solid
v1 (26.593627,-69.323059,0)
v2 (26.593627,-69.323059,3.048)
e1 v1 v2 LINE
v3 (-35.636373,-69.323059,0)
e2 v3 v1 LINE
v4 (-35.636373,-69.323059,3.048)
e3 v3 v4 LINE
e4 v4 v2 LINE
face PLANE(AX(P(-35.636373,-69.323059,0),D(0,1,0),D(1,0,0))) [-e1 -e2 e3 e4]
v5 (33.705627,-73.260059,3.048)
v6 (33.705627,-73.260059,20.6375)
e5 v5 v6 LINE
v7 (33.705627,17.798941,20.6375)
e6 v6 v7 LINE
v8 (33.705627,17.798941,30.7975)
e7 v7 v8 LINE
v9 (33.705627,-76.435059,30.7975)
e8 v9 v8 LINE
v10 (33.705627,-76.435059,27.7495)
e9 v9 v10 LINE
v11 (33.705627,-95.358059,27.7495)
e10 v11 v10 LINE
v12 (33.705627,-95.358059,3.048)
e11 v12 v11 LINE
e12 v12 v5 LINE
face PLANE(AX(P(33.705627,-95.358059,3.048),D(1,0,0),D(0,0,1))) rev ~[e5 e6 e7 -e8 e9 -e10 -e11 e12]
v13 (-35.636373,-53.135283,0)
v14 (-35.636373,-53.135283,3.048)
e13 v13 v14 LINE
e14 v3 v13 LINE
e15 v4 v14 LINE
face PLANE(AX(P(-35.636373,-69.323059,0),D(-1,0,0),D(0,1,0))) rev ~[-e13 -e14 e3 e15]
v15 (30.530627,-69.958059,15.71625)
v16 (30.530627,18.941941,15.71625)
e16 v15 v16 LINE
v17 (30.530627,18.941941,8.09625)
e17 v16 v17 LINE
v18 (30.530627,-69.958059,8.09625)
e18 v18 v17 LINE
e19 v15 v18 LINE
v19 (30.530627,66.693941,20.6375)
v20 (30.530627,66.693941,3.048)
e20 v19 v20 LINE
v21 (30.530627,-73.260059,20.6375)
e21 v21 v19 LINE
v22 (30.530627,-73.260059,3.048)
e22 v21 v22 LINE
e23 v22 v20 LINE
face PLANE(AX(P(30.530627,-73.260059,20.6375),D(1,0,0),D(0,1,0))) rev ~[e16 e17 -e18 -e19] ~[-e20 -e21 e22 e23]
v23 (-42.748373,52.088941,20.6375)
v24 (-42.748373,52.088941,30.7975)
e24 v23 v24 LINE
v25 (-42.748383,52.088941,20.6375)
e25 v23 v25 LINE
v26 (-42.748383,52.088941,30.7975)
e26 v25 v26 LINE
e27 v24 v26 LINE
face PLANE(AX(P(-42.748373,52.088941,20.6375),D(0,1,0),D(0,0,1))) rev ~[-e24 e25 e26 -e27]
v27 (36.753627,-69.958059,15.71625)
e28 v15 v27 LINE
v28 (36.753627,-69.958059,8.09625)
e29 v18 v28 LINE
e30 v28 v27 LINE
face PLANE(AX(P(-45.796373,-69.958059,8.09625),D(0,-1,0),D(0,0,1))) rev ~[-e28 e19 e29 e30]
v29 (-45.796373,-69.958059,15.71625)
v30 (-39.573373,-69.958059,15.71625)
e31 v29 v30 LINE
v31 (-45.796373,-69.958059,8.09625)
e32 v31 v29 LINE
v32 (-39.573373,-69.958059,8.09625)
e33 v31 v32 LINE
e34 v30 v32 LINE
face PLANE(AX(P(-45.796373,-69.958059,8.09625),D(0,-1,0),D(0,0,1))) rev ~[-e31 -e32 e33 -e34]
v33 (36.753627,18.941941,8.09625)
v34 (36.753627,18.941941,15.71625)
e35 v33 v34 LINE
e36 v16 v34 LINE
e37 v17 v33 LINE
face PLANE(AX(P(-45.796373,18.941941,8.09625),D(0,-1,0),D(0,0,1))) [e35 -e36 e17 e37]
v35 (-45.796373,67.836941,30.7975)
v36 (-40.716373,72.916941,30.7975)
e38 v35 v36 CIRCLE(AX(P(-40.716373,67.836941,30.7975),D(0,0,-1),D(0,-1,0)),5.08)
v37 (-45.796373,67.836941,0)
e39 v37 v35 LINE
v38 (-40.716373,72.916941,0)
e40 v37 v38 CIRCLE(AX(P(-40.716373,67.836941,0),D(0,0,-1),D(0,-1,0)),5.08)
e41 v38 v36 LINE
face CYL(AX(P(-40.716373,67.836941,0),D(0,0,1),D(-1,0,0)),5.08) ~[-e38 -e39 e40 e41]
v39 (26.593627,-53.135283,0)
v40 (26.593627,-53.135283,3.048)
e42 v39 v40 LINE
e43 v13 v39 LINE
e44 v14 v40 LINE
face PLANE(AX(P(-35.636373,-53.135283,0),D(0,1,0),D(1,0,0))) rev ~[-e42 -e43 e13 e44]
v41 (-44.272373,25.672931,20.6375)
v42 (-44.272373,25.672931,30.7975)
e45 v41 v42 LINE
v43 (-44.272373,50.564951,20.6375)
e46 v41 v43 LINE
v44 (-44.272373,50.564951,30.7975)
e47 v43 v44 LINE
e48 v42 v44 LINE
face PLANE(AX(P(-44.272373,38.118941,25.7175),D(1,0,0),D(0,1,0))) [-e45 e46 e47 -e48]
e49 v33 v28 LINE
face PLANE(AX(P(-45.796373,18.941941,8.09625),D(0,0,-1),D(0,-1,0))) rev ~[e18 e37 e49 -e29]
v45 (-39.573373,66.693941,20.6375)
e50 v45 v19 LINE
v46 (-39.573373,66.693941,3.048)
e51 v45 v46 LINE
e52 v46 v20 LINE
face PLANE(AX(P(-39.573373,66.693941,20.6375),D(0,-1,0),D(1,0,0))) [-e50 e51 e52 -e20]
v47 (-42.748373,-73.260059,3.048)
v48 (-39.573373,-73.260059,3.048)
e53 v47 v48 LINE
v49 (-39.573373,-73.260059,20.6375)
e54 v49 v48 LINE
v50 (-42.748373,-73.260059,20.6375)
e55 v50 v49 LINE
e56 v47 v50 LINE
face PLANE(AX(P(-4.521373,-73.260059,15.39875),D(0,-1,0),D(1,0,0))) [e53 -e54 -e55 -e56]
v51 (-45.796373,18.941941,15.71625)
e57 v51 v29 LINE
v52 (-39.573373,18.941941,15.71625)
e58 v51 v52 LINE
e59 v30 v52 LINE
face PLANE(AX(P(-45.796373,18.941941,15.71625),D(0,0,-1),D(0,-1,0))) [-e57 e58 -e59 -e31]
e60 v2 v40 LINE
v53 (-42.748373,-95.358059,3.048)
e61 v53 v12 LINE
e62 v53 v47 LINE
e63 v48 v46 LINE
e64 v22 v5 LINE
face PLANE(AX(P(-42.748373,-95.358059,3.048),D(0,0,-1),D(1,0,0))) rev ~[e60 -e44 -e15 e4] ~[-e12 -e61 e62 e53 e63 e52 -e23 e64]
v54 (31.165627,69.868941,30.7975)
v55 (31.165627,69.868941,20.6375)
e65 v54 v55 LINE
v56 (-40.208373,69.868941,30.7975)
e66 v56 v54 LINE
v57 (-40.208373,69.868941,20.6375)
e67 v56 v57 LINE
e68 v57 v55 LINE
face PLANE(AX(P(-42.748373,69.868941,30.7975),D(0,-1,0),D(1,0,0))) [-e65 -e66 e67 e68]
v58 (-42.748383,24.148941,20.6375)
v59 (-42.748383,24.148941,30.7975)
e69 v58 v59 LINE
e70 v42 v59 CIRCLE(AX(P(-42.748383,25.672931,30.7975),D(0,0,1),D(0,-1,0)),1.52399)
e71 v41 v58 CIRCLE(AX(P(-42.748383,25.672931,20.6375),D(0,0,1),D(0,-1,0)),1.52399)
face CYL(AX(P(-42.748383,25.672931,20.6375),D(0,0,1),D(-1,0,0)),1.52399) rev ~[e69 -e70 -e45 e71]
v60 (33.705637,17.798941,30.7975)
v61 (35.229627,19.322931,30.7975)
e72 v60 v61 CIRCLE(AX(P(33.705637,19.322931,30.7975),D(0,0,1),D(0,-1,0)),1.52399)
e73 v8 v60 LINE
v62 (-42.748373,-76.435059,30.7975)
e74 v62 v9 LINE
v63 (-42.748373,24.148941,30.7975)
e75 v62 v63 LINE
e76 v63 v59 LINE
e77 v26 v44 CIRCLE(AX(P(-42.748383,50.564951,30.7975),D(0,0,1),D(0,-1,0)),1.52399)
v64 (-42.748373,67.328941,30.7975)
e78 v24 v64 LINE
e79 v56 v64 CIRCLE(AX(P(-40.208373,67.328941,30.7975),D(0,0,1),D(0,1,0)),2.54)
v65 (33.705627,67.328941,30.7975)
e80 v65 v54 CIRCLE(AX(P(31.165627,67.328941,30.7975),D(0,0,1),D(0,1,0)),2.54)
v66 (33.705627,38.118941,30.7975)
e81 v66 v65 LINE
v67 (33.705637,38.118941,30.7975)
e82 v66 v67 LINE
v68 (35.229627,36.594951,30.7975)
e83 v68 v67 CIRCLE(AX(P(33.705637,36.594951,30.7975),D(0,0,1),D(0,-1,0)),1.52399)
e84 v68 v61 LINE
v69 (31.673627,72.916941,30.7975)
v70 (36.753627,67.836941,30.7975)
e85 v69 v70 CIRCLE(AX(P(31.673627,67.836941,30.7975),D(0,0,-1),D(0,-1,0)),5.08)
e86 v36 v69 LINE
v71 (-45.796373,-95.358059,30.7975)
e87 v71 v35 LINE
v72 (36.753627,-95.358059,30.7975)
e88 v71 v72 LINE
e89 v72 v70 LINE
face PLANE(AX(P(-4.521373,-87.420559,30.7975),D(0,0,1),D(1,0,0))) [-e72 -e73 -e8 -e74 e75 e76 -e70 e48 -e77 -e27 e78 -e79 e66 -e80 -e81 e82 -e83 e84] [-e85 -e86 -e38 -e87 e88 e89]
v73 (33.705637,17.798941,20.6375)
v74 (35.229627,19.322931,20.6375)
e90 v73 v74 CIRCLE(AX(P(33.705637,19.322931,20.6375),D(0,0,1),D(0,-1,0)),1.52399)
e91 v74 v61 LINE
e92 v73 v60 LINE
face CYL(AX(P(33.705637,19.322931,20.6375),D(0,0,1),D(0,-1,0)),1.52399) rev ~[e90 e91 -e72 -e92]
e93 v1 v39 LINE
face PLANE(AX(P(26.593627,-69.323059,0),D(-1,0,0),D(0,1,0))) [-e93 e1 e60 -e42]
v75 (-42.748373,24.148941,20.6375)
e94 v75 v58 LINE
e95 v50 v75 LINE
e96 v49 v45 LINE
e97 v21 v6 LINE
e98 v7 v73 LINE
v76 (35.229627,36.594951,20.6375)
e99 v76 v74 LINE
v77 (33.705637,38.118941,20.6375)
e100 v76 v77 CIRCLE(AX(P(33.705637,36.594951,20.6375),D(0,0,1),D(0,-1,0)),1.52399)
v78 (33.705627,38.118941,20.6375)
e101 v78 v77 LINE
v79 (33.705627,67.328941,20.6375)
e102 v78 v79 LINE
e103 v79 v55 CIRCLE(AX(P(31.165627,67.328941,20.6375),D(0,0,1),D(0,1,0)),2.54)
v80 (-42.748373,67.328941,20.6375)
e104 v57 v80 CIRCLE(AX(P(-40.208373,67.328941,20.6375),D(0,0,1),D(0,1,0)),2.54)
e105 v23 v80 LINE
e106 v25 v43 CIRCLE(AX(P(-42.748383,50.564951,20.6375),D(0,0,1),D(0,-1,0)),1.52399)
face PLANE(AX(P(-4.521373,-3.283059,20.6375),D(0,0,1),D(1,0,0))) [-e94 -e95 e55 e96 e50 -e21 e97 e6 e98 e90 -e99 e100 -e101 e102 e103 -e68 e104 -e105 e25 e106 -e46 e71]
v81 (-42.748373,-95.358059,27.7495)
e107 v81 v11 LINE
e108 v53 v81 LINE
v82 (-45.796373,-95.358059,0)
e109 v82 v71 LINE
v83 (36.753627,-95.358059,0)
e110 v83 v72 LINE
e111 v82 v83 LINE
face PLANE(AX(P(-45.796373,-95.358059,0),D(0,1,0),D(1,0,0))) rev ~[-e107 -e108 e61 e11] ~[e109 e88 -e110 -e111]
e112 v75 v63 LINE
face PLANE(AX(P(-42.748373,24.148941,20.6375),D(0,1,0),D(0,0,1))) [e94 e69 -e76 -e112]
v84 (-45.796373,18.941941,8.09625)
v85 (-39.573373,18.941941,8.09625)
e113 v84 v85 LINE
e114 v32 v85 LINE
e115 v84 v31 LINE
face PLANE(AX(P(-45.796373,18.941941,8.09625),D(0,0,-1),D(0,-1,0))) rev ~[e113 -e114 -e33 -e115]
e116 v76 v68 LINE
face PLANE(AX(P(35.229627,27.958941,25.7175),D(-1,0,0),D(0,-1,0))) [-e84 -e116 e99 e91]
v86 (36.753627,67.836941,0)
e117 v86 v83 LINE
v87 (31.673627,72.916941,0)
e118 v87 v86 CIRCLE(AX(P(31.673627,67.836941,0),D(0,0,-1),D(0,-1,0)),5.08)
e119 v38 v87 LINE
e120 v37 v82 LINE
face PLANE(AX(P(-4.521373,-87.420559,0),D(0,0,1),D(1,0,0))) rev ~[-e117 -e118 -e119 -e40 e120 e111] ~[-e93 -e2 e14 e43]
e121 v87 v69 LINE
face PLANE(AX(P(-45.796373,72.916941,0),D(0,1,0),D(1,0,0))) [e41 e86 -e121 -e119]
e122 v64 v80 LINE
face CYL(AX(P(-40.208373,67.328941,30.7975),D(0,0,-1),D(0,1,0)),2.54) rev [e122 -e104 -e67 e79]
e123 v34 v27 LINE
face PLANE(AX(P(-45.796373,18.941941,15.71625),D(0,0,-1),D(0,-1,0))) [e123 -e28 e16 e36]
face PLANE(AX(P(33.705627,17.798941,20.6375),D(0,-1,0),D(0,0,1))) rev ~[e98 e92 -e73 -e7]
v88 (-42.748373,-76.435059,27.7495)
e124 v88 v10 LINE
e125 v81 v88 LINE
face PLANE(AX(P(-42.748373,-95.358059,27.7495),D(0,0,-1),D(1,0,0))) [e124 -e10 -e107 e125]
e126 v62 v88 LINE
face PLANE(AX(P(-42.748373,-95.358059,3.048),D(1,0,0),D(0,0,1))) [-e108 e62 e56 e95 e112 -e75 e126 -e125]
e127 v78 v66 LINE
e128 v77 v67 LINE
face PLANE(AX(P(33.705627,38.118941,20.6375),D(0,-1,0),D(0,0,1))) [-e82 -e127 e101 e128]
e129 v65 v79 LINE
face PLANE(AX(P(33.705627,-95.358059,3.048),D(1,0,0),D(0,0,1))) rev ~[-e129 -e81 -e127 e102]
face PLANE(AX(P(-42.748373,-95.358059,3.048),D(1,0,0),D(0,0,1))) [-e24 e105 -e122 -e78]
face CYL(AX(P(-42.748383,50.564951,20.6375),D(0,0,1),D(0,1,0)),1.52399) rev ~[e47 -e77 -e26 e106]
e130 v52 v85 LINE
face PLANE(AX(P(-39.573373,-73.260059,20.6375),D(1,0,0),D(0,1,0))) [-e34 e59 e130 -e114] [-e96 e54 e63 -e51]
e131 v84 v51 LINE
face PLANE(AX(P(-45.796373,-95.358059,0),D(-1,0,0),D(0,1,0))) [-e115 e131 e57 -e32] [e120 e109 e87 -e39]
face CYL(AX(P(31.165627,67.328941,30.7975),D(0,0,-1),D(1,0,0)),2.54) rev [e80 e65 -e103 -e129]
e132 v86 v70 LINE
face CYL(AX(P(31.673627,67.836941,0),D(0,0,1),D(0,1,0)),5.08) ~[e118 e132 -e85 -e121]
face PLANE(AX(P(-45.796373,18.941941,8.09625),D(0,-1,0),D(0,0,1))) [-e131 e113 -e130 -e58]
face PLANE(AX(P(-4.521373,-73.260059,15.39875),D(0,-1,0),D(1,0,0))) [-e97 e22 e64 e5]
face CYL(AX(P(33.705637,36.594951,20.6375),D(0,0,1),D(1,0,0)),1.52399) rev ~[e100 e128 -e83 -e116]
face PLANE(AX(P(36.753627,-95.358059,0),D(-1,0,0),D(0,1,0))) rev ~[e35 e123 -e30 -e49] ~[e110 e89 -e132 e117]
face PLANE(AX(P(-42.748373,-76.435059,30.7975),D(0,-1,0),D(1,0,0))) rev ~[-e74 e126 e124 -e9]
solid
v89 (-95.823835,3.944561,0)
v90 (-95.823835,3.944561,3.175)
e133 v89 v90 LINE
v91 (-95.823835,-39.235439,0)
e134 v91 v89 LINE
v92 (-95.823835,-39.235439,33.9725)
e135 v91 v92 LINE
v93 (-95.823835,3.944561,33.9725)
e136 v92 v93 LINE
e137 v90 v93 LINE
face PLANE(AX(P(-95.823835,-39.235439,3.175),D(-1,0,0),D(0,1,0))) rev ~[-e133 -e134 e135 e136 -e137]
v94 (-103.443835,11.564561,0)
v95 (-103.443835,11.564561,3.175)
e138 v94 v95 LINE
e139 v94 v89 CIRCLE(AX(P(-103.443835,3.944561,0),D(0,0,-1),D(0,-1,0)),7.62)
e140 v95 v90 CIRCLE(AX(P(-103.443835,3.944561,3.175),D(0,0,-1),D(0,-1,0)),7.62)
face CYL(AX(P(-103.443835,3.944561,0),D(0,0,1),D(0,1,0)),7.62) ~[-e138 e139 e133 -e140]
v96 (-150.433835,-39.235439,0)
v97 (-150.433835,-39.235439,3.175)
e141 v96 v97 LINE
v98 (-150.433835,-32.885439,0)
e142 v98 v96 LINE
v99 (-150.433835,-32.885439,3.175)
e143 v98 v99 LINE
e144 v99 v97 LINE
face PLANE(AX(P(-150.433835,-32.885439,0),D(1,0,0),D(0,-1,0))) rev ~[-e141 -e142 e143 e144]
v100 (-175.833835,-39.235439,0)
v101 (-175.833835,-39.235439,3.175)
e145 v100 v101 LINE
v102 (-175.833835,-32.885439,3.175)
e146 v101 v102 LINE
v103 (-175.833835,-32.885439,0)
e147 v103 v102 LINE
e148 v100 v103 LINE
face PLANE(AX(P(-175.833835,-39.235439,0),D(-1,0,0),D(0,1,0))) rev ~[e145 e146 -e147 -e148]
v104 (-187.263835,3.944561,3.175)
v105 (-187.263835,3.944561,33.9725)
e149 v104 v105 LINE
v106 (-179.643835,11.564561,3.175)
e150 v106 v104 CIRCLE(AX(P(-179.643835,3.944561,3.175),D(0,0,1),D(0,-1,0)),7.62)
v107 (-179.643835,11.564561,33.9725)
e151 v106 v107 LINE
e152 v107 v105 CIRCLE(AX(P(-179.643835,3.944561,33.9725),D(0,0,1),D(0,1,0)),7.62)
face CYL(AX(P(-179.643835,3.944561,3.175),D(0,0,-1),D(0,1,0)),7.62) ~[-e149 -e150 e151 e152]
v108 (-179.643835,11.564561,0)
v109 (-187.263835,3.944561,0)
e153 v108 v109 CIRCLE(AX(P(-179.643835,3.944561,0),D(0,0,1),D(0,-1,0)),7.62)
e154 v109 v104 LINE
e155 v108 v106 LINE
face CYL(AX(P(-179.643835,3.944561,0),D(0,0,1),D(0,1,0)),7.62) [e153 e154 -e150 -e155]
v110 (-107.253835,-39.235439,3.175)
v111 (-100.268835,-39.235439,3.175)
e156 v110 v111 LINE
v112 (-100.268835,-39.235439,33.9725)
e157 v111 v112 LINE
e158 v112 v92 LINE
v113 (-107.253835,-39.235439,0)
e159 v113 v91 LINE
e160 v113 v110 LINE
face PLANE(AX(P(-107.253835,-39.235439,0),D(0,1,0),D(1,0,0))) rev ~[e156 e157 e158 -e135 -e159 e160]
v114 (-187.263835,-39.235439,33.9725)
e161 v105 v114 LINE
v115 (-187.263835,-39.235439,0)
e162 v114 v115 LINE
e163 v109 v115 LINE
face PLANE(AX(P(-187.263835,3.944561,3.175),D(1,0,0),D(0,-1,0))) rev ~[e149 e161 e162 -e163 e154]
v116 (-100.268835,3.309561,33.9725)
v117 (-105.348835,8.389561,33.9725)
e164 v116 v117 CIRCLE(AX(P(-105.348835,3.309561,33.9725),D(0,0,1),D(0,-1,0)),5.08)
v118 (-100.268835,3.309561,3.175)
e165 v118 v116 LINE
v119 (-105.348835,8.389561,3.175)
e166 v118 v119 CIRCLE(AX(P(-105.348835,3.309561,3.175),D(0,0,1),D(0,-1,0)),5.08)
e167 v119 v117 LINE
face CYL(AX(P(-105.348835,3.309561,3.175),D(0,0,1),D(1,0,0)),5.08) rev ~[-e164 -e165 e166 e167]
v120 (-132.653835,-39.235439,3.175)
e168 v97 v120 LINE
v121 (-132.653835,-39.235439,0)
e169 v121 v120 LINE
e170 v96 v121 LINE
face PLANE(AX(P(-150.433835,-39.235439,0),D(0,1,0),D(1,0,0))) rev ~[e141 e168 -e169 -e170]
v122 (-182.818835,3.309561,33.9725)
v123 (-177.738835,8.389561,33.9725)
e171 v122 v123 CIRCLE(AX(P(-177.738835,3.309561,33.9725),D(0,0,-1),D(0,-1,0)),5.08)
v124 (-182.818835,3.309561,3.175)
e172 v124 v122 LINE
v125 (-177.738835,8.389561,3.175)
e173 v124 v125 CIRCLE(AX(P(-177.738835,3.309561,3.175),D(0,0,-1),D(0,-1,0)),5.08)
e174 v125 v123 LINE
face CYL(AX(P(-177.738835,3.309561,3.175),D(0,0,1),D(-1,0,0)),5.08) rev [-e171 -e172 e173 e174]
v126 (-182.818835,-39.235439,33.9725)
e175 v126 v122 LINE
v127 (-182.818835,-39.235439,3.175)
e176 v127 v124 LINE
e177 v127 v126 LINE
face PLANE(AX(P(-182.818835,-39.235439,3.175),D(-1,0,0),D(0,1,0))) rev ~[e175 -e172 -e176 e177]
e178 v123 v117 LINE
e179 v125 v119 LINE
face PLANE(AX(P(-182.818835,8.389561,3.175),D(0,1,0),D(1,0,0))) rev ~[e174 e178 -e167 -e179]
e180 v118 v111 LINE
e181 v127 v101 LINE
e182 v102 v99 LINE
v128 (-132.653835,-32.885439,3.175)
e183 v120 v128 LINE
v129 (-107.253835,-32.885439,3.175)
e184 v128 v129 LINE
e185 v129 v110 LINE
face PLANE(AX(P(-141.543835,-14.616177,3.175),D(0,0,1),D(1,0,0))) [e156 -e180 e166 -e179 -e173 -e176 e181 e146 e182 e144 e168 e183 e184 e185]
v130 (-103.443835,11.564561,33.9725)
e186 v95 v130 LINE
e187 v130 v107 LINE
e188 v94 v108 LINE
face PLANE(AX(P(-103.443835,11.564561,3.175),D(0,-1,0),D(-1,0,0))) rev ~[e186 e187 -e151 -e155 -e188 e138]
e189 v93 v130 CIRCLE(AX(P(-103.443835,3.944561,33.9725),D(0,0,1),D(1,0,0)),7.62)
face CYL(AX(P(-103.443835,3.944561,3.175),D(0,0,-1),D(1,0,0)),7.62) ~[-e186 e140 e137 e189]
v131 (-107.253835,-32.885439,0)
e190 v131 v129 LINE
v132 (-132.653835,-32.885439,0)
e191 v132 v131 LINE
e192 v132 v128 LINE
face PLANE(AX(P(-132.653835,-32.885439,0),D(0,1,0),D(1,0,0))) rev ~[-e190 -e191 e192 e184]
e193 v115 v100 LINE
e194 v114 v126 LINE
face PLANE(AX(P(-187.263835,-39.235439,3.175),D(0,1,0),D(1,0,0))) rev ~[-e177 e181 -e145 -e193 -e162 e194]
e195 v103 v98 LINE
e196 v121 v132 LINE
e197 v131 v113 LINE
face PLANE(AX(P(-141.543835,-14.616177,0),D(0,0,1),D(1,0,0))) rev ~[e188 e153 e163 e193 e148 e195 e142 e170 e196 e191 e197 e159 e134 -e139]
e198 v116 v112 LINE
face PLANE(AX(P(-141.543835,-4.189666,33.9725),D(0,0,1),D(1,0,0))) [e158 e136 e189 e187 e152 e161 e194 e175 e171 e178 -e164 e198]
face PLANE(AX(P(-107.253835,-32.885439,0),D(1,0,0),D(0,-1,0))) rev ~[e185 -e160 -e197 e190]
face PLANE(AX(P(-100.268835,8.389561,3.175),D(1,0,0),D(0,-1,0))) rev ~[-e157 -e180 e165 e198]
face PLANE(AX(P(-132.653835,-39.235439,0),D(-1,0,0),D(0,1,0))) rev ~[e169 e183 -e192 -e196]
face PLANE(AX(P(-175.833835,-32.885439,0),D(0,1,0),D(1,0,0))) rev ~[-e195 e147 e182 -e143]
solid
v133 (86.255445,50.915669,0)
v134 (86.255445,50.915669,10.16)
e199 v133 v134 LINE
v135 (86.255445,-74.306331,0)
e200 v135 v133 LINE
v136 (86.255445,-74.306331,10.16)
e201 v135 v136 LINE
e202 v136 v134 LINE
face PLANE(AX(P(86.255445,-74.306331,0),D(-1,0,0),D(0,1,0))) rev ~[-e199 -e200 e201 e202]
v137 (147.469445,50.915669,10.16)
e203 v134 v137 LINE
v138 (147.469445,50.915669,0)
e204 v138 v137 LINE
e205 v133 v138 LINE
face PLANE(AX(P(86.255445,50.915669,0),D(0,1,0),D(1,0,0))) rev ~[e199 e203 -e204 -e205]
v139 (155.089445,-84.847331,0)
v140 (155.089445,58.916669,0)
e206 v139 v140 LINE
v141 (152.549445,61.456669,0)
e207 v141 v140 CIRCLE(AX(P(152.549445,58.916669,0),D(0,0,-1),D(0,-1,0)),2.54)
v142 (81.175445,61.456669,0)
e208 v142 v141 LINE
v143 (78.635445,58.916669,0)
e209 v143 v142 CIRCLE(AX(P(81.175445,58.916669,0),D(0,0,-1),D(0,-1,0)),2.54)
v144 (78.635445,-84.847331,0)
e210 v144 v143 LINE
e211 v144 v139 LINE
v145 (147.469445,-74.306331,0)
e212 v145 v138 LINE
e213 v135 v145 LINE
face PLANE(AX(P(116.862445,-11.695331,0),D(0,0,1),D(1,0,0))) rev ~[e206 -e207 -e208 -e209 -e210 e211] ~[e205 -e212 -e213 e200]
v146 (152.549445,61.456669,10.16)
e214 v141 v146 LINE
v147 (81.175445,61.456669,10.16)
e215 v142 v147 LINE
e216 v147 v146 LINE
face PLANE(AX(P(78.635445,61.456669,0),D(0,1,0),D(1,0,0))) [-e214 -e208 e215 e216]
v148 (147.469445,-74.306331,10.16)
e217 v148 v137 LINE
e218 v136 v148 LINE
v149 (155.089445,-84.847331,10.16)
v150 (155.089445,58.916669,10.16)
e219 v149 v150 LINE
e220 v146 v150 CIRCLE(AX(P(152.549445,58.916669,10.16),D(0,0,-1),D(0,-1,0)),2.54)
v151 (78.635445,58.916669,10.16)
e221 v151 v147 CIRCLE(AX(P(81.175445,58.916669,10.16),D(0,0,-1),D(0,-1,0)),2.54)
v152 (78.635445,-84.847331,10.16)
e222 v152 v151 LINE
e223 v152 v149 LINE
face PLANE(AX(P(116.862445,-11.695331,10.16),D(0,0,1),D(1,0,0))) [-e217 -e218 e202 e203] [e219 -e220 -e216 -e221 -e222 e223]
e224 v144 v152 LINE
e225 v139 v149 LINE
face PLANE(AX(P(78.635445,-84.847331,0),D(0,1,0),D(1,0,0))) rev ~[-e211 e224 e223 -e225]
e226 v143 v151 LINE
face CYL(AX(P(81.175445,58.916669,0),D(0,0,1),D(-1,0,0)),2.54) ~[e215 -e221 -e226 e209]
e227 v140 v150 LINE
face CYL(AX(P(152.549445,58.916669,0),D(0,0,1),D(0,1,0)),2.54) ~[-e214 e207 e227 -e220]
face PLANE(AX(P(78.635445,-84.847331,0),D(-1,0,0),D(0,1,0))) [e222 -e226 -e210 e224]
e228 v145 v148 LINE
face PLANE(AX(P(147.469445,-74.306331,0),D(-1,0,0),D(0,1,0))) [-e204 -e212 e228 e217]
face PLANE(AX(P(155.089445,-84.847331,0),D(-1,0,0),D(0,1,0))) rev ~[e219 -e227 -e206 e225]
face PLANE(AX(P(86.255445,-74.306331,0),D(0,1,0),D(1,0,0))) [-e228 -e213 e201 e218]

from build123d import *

# Parameters (mm, degrees)
F0_W      = 82.55
F0_H      = 152.4
F0_W_2    = 62.23
F0_H_2    = 16.1877755683
F1_DEPTH  = 30.7975
F2_W      = 76.454
F2_H      = 146.304
F2_W_2    = 62.23
F2_H_2    = 16.1877755683
F3_DEPTH  = 10.16
F4_W      = 70.104
F4_H      = 139.954
F4_W_2    = 62.23
F4_H_2    = 16.1877755683
F5_DEPTH  = 17.5895
F0_H_3    = 15.875
F6_DEPTH  = 30.7975
F7_W      = 76.454
F7_H      = 24.7015
F8_DEPTH  = 22.098
F9_W      = 88.9
F9_H      = 7.62
F10_DEPTH = 82.55
F11_R     = 5.08
F12_W     = 27.94
F12_H     = 10.16
F13_DEPTH = 1.524
F14_R     = 1.52399
F15_W     = 20.32
F15_H     = 10.16
F16_DEPTH = 1.524
F17_R     = 1.52399
F18_R     = 2.54
F20_DEPTH = 3.175
F21_R     = 7.62
F23_DEPTH = 30.7975
F24_R     = 5.08
F25_W     = 76.454
F25_H     = 146.304
F25_W_2   = 61.214
F25_H_2   = 125.222
F26_DEPTH = 10.16
F27_R     = 2.54


# Not quite as in the source:
# - a fillet or chamfer is up to 0.001 mm smaller than in the source, because OpenCascade refuses the exact size


with BuildPart() as f1:
    # F0 (on Top) → F1 (new body)
    with BuildSketch(Plane.XY):
        with Locations((-4.5213731422, -3.2830588596)):
            Rectangle(F0_W, F0_H)
        with Locations((-4.5213731422, -61.2291710755)):
            Rectangle(F0_W_2, F0_H_2, mode=Mode.SUBTRACT)
    extrude(amount=F1_DEPTH)

    # F2 (on face) → F3 (cut)
    with BuildSketch(Plane.XY.offset(30.7975)):
        with Locations((-4.5213731422, -3.2830588596)):
            Rectangle(F2_W, F2_H)
        with Locations((-4.5213731422, -61.2291710755)):
            Rectangle(F2_W_2, F2_H_2, mode=Mode.SUBTRACT)
    extrude(amount=-F3_DEPTH, mode=Mode.SUBTRACT)

    # F4 (on face) → F5 (cut)
    with BuildSketch(Plane.XY.offset(20.6375)):
        with Locations((-4.5213731422, -3.2830588596)):
            Rectangle(F4_W, F4_H)
        with Locations((-4.5213731422, -61.2291710755)):
            Rectangle(F4_W_2, F4_H_2, mode=Mode.SUBTRACT)
    extrude(amount=-F5_DEPTH, mode=Mode.SUBTRACT)

    # F0 (on Top) → F6 (join)
    with BuildSketch(Plane.XY):
        with Locations((-4.5213731422, -87.4205588596)):
            Rectangle(F0_W, F0_H_3)
    extrude(amount=F6_DEPTH)

    # F7 (on face) → F8 (cut, through all)
    with BuildSketch(Plane.XZ.offset(95.3580588596)):
        with Locations((-4.5213731422, 15.39875)):
            Rectangle(F7_W, F7_H)
    extrude(amount=-F8_DEPTH, mode=Mode.SUBTRACT)

    # F9 (on face) → F10 (cut, through all)
    with BuildSketch(Plane(origin=(-45.7963731422, 0, 0), x_dir=(0, -1, 0), z_dir=(-1, 0, 0))):
        with Locations((25.5080588596, 11.90625)):
            Rectangle(F9_W, F9_H)
    extrude(amount=-F10_DEPTH, mode=Mode.SUBTRACT)

    # F11
    f11_edges = [f1.edges().sort_by_distance(p)[0] for p in [
        (-45.796373, 72.916941, 15.39875),
        (36.753627, 72.916941, 15.39875),
    ]]
    fillet(f11_edges, radius=F11_R)

    # F12 (on face) → F13 (cut)
    with BuildSketch(Plane.YZ.offset(-42.7483731422)):
        with Locations((38.1189411404, 25.7175)):
            Rectangle(F12_W, F12_H)
    extrude(amount=-F13_DEPTH, mode=Mode.SUBTRACT)

    # F14 (radius 1.524 in the source; OpenCascade refuses exactly that, so slightly less here)
    f14_edges = [f1.edges().sort_by_distance(p)[0] for p in [
        (-44.272373, 52.088941, 25.7175),
        (-44.272373, 24.148941, 25.7175),
    ]]
    fillet(f14_edges, radius=F14_R)

    # F15 (on face) → F16 (cut)
    with BuildSketch(Plane(origin=(33.7056268578, 0, 0), x_dir=(0, -1, 0), z_dir=(-1, 0, 0))):
        with Locations((-27.9589411404, 25.7175)):
            Rectangle(F15_W, F15_H)
    extrude(amount=-F16_DEPTH, mode=Mode.SUBTRACT)

    # F17 (radius 1.524 in the source; OpenCascade refuses exactly that, so slightly less here)
    f17_edges = [f1.edges().sort_by_distance(p)[0] for p in [
        (35.229627, 38.118941, 25.7175),
        (35.229627, 17.798941, 25.7175),
    ]]
    fillet(f17_edges, radius=F17_R)

    # F18
    f18_edges = [f1.edges().sort_by_distance(p)[0] for p in [
        (-42.748373, 69.868941, 25.7175),
        (33.705627, 69.868941, 25.7175),
    ]]
    fillet(f18_edges, radius=F18_R)


with BuildPart() as f20:
    # F19 (on Top) → F20 (new body)
    with BuildSketch(Plane.XY):
        Polygon((-95.8238354015, 11.5645605006), (-187.2638354015, 11.5645605006), (-187.2638354015, -39.2354394994), (-175.8338354015, -39.2354394994), (-175.8338354015, -32.8854394994), (-150.4338354015, -32.8854394994), (-150.4338354015, -39.2354394994), (-132.6538354015, -39.2354394994), (-132.6538354015, -32.8854394994), (-107.2538354015, -32.8854394994), (-107.2538354015, -39.2354394994), (-95.8238354015, -39.2354394994), align=None)
    extrude(amount=F20_DEPTH)

    # F21
    f21_edges = [f20.edges().sort_by_distance(p)[0] for p in [
        (-187.263835, 11.564561, 1.5875),
        (-95.823835, 11.564561, 1.5875),
    ]]
    fillet(f21_edges, radius=F21_R)

    # F22 (on face) → F23 (join)
    with BuildSketch(Plane.XY.offset(3.175)):
        with BuildLine():
            Line((-182.8188354015, -39.2354394994), (-182.8188354015, 8.3895605006))
            Line((-182.8188354015, 8.3895605006), (-100.2688354015, 8.3895605006))
            Line((-100.2688354015, 8.3895605006), (-100.2688354015, -39.2354394994))
            Line((-100.2688354015, -39.2354394994), (-95.8238354015, -39.2354394994))
            Line((-95.8238354015, -39.2354394994), (-95.8238354015, 3.9445605006))
            ThreePointArc((-95.8238354015, 3.9445605006), (-98.0556817289, 9.3327141732), (-103.4438354015, 11.5645605006))
            Line((-103.4438354015, 11.5645605006), (-179.6438354015, 11.5645605006))
            ThreePointArc((-179.6438354015, 11.5645605006), (-185.0319890742, 9.3327141732), (-187.2638354015, 3.9445605006))
            Line((-187.2638354015, 3.9445605006), (-187.2638354015, -39.2354394994))
            Line((-187.2638354015, -39.2354394994), (-182.8188354015, -39.2354394994))
        make_face()
    extrude(amount=F23_DEPTH)

    # F24
    f24_edges = [f20.edges().sort_by_distance(p)[0] for p in [
        (-182.818835, 8.389561, 18.57375),
        (-100.268835, 8.389561, 18.57375),
    ]]
    fillet(f24_edges, radius=F24_R)


with BuildPart() as f26:
    # F25 (on Top) → F26 (new body)
    with BuildSketch(Plane.XY):
        with Locations((116.8624450643, -11.695331095)):
            Rectangle(F25_W, F25_H)
        with Locations((116.8624450643, -11.695331095)):
            Rectangle(F25_W_2, F25_H_2, mode=Mode.SUBTRACT)
    extrude(amount=F26_DEPTH)

    # F27
    f27_edges = [f26.edges().sort_by_distance(p)[0] for p in [
        (78.635445, 61.456669, 5.08),
        (155.089445, 61.456669, 5.08),
    ]]
    fillet(f27_edges, radius=F27_R)


solid = Compound([f1.part, f20.part, f26.part])
